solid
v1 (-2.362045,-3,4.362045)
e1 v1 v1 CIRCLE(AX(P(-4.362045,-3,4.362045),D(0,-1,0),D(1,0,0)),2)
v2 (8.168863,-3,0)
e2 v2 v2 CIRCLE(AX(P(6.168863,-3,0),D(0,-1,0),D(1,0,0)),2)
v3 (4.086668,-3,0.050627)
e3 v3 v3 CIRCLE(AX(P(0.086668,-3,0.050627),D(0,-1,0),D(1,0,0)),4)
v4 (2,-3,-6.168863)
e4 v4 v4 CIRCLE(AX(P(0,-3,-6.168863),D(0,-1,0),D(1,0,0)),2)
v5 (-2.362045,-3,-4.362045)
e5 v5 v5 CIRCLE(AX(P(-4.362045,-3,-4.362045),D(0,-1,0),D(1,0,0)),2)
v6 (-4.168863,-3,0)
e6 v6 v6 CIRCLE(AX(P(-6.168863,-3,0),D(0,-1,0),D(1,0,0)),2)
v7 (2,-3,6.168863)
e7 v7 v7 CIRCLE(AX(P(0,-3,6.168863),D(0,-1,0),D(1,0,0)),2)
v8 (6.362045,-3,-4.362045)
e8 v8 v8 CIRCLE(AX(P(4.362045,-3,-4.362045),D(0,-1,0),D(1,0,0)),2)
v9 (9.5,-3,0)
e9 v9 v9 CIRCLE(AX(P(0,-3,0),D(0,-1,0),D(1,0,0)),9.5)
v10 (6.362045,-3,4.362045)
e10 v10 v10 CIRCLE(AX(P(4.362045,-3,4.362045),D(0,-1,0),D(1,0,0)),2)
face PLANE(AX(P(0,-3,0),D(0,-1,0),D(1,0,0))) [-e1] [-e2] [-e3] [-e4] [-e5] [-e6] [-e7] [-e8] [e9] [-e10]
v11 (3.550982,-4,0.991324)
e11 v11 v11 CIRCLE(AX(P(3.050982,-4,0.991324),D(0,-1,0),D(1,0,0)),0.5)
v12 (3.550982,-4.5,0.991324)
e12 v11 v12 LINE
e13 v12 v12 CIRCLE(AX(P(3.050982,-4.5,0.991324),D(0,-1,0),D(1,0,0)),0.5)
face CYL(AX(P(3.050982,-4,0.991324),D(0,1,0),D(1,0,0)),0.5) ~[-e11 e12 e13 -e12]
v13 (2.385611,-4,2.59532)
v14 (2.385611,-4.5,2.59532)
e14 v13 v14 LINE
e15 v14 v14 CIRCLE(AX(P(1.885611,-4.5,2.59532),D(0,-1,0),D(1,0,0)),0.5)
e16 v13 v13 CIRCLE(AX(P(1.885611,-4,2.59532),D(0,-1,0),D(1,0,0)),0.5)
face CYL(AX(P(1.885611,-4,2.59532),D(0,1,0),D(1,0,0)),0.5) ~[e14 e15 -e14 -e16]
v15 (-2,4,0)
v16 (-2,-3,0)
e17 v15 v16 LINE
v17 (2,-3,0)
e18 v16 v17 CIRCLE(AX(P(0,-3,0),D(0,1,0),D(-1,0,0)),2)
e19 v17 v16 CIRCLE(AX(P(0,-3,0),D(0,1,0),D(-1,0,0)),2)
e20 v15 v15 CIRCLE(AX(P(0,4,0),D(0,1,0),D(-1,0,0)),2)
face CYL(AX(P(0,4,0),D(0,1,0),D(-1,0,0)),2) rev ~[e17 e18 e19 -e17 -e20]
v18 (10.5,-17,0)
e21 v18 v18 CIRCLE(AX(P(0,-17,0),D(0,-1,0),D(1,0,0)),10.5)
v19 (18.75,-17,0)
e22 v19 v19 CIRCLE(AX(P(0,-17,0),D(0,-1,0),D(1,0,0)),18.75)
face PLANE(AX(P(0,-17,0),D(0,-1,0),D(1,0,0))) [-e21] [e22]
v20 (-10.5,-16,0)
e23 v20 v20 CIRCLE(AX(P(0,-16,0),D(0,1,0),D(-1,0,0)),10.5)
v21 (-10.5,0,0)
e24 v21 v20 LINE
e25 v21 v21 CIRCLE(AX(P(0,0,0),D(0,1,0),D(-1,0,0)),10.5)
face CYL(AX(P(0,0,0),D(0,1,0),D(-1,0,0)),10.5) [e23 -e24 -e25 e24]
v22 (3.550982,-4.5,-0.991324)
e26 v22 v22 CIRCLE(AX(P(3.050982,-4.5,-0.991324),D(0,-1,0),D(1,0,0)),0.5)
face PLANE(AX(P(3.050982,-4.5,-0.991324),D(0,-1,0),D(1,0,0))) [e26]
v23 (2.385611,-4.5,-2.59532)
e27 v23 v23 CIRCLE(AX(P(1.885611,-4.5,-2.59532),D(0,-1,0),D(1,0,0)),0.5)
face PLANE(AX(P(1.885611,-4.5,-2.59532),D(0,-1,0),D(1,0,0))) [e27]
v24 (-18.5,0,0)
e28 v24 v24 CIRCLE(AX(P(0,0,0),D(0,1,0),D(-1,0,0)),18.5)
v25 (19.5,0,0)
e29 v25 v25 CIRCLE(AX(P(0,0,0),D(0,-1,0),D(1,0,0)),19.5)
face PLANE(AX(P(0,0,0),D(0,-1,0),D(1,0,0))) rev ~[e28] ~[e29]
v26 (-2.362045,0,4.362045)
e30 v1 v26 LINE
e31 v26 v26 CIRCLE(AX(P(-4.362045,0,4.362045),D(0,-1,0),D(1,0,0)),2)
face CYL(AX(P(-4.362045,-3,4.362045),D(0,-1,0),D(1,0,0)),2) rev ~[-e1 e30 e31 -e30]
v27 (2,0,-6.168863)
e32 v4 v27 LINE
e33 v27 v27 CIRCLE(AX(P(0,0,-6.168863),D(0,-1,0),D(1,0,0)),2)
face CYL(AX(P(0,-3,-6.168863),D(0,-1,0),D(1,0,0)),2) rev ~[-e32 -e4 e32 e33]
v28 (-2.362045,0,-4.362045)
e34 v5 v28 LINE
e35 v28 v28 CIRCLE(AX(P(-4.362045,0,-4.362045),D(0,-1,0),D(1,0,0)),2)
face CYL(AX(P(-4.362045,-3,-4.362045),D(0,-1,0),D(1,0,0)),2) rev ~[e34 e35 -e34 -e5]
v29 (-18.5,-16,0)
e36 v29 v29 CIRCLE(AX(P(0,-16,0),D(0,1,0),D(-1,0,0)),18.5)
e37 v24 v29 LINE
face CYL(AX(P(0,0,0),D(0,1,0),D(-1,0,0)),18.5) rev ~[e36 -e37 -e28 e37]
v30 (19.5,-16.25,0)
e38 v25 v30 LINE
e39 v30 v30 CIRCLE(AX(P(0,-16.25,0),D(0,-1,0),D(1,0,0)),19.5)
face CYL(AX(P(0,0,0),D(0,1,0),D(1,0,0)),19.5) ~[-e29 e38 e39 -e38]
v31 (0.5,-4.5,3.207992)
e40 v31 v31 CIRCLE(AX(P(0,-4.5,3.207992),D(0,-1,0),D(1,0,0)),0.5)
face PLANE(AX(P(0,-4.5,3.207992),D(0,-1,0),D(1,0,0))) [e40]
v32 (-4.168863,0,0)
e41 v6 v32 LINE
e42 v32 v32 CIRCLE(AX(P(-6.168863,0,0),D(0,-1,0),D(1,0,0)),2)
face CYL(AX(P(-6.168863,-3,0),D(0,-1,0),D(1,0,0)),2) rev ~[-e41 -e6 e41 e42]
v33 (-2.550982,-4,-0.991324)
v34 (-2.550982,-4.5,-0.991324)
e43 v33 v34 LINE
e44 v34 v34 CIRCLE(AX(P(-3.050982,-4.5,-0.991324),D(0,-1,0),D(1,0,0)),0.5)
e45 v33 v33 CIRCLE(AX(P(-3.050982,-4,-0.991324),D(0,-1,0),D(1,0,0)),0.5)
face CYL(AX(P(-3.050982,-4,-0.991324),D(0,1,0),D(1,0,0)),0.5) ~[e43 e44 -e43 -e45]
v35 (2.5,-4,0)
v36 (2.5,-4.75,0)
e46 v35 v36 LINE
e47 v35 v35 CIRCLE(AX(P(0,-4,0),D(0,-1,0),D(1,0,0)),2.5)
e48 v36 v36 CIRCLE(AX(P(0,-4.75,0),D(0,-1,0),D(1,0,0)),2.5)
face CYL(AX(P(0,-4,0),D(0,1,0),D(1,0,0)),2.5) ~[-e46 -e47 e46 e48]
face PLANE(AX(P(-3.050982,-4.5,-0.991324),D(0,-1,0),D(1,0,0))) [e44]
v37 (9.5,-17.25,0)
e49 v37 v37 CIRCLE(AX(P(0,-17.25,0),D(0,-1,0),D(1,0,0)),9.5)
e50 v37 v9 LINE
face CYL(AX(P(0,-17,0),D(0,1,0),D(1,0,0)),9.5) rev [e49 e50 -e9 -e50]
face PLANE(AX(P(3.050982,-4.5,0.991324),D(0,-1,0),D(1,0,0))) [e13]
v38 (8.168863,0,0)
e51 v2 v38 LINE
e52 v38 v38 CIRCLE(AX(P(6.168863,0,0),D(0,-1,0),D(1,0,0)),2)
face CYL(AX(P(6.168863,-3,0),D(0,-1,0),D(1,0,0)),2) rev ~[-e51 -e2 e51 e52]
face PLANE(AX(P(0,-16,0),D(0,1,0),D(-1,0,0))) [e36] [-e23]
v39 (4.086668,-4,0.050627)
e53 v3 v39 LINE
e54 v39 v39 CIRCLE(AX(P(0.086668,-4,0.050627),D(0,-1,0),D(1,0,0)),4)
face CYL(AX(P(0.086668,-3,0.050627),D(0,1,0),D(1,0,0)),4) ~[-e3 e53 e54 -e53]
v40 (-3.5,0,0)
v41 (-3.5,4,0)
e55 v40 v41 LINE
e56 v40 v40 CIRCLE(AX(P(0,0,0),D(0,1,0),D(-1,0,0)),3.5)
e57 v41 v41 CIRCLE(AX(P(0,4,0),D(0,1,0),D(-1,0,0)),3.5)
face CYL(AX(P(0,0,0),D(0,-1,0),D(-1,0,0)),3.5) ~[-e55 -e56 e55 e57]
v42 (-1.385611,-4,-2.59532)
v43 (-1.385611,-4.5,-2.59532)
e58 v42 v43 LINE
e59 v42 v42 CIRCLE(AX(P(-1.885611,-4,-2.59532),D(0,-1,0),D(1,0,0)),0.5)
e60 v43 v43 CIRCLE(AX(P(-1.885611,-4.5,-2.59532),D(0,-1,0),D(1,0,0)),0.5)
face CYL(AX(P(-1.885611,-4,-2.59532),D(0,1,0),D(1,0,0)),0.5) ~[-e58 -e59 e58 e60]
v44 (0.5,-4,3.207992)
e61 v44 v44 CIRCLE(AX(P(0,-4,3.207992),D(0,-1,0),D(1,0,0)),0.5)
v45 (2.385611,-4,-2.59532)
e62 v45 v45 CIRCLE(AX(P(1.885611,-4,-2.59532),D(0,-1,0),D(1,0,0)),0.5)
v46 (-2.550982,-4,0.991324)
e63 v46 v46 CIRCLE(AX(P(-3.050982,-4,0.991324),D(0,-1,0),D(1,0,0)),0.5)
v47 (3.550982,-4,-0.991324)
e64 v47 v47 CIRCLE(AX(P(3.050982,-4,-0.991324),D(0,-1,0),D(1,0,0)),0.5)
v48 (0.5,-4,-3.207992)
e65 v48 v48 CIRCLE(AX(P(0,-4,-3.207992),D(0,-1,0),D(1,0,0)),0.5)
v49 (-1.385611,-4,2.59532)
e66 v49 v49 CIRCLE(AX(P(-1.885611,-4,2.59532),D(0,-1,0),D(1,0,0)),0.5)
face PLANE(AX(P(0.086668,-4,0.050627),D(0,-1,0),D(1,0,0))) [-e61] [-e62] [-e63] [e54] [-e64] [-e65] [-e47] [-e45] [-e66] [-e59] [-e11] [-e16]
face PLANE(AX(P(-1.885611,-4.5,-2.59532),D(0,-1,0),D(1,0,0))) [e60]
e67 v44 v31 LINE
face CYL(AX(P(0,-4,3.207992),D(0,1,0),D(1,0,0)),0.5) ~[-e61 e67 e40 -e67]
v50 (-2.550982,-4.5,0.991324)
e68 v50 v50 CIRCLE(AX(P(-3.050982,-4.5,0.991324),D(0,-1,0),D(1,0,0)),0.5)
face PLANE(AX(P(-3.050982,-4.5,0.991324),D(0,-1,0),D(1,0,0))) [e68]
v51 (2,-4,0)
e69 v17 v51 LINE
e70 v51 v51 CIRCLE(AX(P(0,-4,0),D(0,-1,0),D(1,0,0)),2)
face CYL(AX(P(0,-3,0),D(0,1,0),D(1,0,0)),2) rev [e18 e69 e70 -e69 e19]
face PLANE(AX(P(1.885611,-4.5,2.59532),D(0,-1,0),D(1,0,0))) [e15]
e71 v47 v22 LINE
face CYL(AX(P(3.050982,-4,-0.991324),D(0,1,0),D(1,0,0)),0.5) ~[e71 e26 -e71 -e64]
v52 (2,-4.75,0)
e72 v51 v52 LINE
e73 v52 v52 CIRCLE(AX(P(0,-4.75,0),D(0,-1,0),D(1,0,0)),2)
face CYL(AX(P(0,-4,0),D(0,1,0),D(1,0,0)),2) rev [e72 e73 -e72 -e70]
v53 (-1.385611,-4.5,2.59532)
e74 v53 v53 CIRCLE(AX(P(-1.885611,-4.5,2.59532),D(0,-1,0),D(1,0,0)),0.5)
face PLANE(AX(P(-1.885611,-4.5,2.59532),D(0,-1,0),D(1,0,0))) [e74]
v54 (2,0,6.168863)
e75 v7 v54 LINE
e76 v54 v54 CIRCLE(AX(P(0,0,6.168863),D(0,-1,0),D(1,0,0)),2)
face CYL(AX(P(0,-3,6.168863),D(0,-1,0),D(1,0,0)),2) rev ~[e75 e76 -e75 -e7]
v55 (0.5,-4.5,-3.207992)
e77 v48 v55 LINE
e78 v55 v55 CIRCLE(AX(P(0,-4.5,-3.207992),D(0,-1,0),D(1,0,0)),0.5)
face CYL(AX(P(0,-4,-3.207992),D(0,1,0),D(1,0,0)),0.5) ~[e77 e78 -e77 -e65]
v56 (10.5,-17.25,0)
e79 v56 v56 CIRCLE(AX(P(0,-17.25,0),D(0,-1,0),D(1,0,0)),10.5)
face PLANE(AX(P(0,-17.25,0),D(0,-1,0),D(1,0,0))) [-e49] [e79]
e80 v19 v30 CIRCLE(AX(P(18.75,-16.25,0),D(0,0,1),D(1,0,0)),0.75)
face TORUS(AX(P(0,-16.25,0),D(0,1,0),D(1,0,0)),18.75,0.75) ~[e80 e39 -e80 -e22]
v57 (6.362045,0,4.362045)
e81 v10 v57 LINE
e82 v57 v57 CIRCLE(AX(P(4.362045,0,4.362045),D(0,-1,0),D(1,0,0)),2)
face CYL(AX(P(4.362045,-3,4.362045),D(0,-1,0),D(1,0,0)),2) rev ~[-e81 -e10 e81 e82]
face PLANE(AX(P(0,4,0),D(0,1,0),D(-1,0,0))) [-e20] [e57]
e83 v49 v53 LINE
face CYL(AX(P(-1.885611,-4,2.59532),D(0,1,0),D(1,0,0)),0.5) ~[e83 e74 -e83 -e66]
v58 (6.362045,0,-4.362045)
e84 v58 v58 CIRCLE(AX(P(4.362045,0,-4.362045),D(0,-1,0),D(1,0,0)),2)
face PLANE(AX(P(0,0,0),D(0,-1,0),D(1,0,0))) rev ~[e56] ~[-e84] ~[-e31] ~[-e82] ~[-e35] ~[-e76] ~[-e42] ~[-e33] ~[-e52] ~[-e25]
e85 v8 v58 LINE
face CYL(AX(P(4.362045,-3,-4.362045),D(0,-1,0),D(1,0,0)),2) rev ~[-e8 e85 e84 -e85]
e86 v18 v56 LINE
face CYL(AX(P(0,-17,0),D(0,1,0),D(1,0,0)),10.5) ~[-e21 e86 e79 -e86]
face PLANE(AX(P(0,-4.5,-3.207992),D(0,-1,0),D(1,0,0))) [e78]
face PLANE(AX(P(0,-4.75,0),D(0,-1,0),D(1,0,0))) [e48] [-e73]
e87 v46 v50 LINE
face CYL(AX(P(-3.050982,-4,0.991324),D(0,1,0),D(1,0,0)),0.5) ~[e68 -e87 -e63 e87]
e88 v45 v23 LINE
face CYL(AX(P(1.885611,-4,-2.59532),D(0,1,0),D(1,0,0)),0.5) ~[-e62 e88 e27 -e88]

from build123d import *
from build123d import SkipClean  # not in build123d's __all__

# Parameters (mm, degrees)
F0_R      = 19.5
F1_DEPTH  = 17
F2_R      = 9.5
F3_DEPTH  = 14
F4_R      = 18.5
F4_R_2    = 10.5
F5_DEPTH  = 16
F6_R      = 2
F7_DEPTH  = 25
F8_R      = 3.5
F9_DEPTH  = 4
F10_R     = 2
F11_DEPTH = 138.7
F12_R     = 4
F12_R_2   = 2
F13_DEPTH = 1
F14_R     = 2.5
F14_R_2   = 2
F15_DEPTH = 0.75
F16_R     = 0.5
F17_DEPTH = 0.5
F19_R     = 0.75
F18_R     = 10.5
F18_R_2   = 9.5
F20_DEPTH = 0.25


# Not quite as in the source:
# - after a boolean that leaves OpenCascade's solid faulty, fix() repairs it


with BuildPart() as f1:
    # F0 (on Front) → F1 (new body)
    with BuildSketch(Plane.XZ):
        Circle(F0_R)
    extrude(amount=F1_DEPTH)

    # F2 (on face) → F3 (cut)
    with BuildSketch(Plane.XZ.offset(17)):
        Circle(F2_R)
    extrude(amount=-F3_DEPTH, mode=Mode.SUBTRACT)

    # F4 (on face) → F5 (cut)
    with BuildSketch(Plane(origin=(0, 0, 0), x_dir=(-1, 0, 0), z_dir=(0, 1, 0))):
        Circle(F4_R)
        Circle(F4_R_2, mode=Mode.SUBTRACT)
    extrude(amount=-F5_DEPTH, mode=Mode.SUBTRACT)

    # F6 (on face) → F7 (cut)
    with BuildSketch(Plane.XZ.offset(3)):
        with Locations((0, 6.1688632704)):
            Circle(F6_R)
        with Locations((-4.3620450507, 4.3620450507)):
            Circle(F6_R)
        with Locations((-6.1688632704, 0)):
            Circle(F6_R)
        with Locations((-4.3620450507, -4.3620450507)):
            Circle(F6_R)
        with Locations((0, -6.1688632704)):
            Circle(F6_R)
        with Locations((4.3620450507, -4.3620450507)):
            Circle(F6_R)
        with Locations((6.1688632704, 0)):
            Circle(F6_R)
        with Locations((4.3620450507, 4.3620450507)):
            Circle(F6_R)
    extrude(amount=-F7_DEPTH, mode=Mode.SUBTRACT)

    # F8 (on face) → F9 (join)
    with BuildSketch(Plane(origin=(0, 0, 0), x_dir=(-1, 0, 0), z_dir=(0, 1, 0))):
        Circle(F8_R)
    extrude(amount=F9_DEPTH)

    # F10 (on face) → F11 (cut)
    with BuildSketch(Plane(origin=(0, 4, 0), x_dir=(-1, 0, 0), z_dir=(0, 1, 0))):
        Circle(F10_R)
    extrude(amount=-F11_DEPTH, mode=Mode.SUBTRACT)

    # F12 (on face) → F13 (join)
    with BuildSketch(Plane.XZ.offset(3)):
        with Locations((0.0866679911, 0.0506265242)):
            Circle(F12_R)
        Circle(F12_R_2, mode=Mode.SUBTRACT)
    with SkipClean():  # cleaning this boolean's faces spoils the solid; the shape is the same uncleaned
        extrude(amount=F13_DEPTH)

    # F14 (on face) → F15 (join)
    with BuildSketch(Plane.XZ.offset(4)):
        Circle(F14_R)
        Circle(F14_R_2, mode=Mode.SUBTRACT)
    extrude(amount=F15_DEPTH)

    add(f1.part.fix(), mode=Mode.REPLACE)

    # F16 (on face) → F17 (join)
    with BuildSketch(Plane.XZ.offset(4)):
        with Locations((0, 3.2079922967)):
            Circle(F16_R)
        with Locations((-1.8856105614, 2.5953202858)):
            Circle(F16_R)
        with Locations((-3.050981978, 0.9913241375)):
            Circle(F16_R)
        with Locations((-3.050981978, -0.9913241375)):
            Circle(F16_R)
        with Locations((-1.8856105614, -2.5953202858)):
            Circle(F16_R)
        with Locations((0, -3.2079922967)):
            Circle(F16_R)
        with Locations((1.8856105614, -2.5953202858)):
            Circle(F16_R)
        with Locations((3.050981978, -0.9913241375)):
            Circle(F16_R)
        with Locations((3.050981978, 0.9913241375)):
            Circle(F16_R)
        with Locations((1.8856105614, 2.5953202858)):
            Circle(F16_R)
    extrude(amount=F17_DEPTH)

    # F19
    f19_edges = [f1.edges().sort_by_distance(p)[0] for p in [
        (-19.5, -17, 0),
    ]]
    fillet(f19_edges, radius=F19_R)

    # F18 (on face) → F20 (join)
    with BuildSketch(Plane.XZ.offset(17)):
        Circle(F18_R)
        Circle(F18_R_2, mode=Mode.SUBTRACT)
    extrude(amount=F20_DEPTH)


solid = f1.part
